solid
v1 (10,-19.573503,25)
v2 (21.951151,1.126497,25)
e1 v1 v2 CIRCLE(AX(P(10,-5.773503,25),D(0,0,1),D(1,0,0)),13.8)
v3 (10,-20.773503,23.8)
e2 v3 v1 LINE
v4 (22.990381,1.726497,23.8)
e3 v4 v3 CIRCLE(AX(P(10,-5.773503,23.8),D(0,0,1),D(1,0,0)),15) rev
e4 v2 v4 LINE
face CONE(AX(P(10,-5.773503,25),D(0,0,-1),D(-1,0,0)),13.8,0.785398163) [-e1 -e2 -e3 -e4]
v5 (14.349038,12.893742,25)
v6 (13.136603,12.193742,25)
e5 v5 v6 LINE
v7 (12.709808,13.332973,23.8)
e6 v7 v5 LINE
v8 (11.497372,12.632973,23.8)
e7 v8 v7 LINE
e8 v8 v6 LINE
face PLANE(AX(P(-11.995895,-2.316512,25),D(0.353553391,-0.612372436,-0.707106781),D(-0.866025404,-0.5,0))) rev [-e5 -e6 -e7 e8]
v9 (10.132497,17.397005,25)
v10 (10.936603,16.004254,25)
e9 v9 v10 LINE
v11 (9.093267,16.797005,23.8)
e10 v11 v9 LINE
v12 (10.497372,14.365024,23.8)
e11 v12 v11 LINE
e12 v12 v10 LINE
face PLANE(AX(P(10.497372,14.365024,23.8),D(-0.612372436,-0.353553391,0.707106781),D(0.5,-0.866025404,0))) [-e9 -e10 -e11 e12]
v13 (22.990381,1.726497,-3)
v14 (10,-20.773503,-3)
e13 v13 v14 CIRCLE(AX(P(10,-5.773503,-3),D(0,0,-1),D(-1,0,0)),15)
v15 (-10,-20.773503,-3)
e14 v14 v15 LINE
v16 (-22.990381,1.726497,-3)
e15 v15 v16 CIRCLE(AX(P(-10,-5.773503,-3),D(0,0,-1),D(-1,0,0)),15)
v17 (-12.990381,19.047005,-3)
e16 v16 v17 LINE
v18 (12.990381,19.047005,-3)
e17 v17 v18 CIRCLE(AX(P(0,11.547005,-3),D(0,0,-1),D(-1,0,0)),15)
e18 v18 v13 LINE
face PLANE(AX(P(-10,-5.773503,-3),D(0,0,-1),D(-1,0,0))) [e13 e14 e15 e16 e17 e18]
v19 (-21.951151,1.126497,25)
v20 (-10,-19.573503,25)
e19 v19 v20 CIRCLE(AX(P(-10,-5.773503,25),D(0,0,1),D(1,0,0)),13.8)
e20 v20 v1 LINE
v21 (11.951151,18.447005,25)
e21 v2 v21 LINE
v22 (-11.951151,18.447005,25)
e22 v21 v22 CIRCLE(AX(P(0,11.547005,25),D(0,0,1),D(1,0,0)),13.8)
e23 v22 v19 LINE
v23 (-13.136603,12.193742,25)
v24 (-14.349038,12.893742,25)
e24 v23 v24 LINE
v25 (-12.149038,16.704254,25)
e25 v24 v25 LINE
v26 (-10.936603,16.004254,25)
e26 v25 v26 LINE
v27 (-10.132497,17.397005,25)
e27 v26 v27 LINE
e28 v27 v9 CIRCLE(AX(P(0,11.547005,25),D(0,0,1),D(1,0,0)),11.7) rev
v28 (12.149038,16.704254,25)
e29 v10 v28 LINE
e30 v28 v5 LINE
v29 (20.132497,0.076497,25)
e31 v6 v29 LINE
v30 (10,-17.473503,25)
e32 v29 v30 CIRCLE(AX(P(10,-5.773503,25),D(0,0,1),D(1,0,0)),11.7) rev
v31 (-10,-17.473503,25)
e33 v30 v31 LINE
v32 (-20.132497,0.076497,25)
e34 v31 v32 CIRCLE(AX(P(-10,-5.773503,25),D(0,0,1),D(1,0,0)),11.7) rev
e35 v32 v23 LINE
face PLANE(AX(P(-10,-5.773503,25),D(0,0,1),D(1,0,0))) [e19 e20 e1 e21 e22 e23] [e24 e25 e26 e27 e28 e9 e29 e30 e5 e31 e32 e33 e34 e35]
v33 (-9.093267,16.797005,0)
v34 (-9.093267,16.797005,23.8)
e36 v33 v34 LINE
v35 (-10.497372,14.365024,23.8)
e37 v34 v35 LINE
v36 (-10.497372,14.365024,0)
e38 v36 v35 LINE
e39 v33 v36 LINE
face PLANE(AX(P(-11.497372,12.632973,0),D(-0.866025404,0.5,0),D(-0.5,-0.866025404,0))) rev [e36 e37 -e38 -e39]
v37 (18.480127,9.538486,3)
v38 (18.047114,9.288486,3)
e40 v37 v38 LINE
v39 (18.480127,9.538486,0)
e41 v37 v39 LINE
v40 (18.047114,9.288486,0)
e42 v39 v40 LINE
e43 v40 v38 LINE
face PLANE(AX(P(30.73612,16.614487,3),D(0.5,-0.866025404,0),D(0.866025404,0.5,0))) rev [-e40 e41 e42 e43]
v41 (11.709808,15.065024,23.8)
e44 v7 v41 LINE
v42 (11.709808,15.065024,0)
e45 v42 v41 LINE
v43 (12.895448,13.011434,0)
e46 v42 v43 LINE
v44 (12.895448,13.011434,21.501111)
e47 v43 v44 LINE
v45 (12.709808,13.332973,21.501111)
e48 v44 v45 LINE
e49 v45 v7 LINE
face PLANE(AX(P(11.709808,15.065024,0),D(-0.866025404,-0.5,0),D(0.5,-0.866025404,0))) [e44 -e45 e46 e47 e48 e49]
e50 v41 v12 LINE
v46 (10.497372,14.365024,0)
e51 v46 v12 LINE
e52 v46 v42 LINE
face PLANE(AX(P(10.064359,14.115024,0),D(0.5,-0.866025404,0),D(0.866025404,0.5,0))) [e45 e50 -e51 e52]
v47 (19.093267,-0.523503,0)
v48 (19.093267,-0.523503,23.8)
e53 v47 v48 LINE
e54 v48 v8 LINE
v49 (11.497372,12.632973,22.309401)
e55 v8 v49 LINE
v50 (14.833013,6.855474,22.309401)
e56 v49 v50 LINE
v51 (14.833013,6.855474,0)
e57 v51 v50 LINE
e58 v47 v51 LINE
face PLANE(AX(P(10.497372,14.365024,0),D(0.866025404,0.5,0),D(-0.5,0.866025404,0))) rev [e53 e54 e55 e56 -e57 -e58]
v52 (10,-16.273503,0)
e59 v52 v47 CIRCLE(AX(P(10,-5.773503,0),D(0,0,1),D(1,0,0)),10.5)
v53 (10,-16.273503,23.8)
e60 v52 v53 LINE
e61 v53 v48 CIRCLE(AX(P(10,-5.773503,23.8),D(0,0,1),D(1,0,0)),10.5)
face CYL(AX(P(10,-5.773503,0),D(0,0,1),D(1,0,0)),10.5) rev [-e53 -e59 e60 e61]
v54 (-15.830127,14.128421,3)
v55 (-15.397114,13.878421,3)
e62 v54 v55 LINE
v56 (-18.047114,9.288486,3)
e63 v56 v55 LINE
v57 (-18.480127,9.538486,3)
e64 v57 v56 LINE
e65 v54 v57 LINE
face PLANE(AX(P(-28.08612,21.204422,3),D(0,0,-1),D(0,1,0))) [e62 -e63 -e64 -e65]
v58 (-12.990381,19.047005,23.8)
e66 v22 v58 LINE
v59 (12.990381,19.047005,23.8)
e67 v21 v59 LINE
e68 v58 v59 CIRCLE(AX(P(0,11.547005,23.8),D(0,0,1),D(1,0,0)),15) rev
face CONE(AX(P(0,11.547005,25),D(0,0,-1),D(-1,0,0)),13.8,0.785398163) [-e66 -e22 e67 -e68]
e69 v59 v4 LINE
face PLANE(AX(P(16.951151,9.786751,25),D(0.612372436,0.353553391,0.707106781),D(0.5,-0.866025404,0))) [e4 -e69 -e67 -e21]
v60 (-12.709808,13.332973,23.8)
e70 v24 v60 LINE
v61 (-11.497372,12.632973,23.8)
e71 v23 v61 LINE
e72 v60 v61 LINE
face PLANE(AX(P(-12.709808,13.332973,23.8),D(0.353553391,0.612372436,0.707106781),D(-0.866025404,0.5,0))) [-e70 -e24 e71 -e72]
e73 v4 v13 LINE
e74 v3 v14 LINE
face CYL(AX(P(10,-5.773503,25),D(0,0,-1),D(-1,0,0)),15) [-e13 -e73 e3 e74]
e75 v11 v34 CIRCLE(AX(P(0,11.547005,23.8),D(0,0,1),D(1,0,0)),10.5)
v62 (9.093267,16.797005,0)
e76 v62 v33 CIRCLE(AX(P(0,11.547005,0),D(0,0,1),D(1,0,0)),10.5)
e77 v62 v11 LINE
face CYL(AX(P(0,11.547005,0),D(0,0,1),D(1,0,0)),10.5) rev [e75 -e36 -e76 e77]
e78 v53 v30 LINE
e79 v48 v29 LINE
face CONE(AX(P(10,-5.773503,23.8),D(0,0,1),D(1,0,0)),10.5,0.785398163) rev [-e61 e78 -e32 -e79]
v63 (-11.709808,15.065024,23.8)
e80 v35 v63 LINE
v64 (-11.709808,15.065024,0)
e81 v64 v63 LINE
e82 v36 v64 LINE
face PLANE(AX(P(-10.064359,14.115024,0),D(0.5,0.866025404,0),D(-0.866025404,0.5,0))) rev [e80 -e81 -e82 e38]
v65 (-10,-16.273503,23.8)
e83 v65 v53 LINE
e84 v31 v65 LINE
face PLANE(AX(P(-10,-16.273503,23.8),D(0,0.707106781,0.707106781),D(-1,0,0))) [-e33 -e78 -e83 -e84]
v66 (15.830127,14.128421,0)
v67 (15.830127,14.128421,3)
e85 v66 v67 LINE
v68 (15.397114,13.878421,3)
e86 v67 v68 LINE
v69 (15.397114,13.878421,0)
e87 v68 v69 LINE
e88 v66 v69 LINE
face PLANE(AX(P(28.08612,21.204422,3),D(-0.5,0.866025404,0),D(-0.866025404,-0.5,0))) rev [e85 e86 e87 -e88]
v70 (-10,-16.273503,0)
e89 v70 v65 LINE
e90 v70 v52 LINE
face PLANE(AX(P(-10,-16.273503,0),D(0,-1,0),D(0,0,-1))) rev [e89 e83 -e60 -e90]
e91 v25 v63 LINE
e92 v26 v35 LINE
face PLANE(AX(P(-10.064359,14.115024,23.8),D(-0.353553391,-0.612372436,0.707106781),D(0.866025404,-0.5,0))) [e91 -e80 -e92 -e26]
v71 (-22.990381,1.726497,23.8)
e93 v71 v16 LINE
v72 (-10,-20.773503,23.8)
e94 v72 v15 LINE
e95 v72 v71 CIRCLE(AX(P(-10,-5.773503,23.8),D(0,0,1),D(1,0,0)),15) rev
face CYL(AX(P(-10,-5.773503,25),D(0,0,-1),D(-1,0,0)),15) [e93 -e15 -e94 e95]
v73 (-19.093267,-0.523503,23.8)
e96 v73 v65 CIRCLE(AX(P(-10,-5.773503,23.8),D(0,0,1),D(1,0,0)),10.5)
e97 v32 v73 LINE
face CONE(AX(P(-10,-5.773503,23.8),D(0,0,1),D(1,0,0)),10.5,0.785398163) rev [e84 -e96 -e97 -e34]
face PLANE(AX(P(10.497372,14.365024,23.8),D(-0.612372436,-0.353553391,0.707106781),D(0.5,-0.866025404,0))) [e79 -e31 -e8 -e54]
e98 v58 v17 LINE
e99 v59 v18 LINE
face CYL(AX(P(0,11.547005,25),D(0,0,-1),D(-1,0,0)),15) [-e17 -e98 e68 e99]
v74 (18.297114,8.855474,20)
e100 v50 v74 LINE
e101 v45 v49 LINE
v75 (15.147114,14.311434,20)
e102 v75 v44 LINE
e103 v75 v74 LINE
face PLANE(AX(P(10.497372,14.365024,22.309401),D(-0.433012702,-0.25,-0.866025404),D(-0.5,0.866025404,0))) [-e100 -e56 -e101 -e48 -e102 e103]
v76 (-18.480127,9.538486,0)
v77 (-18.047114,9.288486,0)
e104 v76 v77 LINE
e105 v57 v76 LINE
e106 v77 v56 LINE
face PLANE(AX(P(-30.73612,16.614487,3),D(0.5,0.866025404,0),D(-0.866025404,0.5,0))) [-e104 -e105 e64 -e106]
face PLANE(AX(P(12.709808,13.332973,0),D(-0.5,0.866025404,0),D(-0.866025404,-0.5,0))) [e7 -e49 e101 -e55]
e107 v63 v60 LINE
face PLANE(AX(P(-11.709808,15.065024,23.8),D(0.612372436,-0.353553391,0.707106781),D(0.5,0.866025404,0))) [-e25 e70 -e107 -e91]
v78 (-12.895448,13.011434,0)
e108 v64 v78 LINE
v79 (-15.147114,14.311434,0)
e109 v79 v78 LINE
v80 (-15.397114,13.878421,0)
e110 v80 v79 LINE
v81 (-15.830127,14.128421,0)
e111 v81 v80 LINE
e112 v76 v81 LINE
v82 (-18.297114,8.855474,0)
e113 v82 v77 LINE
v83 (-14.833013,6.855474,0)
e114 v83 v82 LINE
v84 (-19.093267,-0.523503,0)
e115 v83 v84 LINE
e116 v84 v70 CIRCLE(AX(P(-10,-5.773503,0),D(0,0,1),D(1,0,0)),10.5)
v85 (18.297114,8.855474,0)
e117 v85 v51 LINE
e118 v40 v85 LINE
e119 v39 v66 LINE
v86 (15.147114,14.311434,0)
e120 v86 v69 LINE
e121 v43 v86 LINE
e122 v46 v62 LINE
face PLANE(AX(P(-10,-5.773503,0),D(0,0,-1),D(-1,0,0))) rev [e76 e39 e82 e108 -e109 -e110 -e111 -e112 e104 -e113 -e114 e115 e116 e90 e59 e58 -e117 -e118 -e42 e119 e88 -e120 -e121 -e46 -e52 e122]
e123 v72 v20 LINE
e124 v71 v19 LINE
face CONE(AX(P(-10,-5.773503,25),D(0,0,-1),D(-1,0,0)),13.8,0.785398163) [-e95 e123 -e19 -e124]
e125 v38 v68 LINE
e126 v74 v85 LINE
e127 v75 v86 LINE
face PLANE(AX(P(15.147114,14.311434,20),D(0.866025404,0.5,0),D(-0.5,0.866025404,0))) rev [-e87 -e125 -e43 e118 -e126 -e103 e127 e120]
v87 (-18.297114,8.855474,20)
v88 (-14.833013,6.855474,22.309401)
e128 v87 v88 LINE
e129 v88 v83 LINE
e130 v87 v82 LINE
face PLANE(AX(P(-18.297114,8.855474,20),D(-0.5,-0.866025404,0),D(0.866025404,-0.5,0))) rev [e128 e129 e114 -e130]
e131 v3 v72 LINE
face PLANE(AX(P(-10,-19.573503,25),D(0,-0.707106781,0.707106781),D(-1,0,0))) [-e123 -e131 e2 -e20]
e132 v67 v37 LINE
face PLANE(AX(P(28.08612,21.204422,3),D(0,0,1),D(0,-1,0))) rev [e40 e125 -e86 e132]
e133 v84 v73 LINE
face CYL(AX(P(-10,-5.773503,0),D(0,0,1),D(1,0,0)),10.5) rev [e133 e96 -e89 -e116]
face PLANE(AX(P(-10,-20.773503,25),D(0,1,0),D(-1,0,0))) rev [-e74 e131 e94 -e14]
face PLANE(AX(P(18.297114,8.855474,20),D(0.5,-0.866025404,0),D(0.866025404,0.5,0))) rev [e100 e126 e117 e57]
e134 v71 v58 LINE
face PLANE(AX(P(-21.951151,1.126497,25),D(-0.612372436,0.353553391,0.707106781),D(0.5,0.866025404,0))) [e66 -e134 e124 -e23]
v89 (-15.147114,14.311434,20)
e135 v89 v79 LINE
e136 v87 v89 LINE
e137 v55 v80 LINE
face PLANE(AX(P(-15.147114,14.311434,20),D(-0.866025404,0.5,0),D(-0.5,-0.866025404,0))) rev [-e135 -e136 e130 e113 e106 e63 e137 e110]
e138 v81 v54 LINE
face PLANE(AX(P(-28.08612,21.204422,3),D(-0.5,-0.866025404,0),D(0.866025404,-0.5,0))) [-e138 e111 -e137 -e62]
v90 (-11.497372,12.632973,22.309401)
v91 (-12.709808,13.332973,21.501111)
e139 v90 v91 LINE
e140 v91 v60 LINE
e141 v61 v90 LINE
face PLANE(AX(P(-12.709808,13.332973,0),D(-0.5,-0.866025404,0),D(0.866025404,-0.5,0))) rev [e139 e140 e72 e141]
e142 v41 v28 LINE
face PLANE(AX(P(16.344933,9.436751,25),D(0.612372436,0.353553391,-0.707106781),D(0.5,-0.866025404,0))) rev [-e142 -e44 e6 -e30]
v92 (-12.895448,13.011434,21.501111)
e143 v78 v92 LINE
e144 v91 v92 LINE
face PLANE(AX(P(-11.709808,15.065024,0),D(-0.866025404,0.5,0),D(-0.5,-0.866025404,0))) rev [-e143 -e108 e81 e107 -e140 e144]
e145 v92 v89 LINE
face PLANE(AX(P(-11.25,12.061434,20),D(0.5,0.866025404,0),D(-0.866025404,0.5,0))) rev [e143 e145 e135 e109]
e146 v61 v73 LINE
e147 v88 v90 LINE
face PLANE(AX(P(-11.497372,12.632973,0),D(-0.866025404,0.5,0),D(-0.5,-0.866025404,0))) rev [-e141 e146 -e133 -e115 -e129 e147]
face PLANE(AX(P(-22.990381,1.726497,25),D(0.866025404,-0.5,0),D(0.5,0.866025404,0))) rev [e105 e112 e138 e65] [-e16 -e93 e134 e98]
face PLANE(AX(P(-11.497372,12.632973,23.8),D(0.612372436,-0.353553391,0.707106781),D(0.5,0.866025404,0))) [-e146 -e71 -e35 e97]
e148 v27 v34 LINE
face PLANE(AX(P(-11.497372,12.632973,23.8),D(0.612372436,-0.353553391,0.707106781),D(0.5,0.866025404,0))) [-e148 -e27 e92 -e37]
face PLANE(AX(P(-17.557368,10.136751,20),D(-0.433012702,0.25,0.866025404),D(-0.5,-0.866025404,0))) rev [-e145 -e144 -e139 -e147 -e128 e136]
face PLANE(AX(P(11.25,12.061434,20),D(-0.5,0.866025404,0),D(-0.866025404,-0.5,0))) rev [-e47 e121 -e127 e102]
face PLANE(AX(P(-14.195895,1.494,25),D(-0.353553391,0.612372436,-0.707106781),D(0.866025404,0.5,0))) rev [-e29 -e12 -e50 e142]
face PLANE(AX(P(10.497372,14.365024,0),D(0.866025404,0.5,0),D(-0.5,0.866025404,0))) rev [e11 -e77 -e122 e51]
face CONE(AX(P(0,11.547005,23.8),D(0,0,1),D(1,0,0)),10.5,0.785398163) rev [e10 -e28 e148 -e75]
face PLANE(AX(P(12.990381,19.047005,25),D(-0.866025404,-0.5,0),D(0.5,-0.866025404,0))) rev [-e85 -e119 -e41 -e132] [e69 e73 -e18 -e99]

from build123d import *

# Parameters (mm, degrees)
BOSS_EXTRU_1_DEPTH      = 25
ENL_V_MAT_EXTRU_1_DEPTH = 20
ENL_V_MAT_EXTRU_2_DEPTH = 45.21248121115924
ENL_V_MAT_EXTRU_4_DEPTH = 20
ENL_V_MAT_EXTRU_3_DEPTH = 45.21248121115924
CHANFREIN1_SIZE         = 1.2
BOSS_EXTRU_2_START      = 3
BOSS_EXTRU_2_DEPTH      = 3
ENL_V_MAT_EXTRU_5_REACH = 47.001
ESQUISSE7_W             = 1.399999999999995
ESQUISSE7_H             = 20
CHANFREIN2_SIZE2        = 4
CHANFREIN2_SIZE         = 2.309401077
ENL_V_MAT_EXTRU_6_REACH = 60.237
CHANFREIN3_SIZE2        = 4
CHANFREIN3_SIZE         = 2.309401077


with BuildPart() as part:
    # Esquisse1 → Boss.-Extru.1 (new body)
    with BuildSketch(Plane.XY):
        with BuildLine():
            Line((-22.99038105676658, 1.7264973081037391), (-12.990381056766578, 19.047005383792516))
            ThreePointArc((-12.990381056766578, 19.047005383792516), (9.5e-16, 26.547005383792516), (12.990381056766578, 19.047005383792513))
            Line((12.990381056766578, 19.047005383792513), (22.990381056766577, 1.726497308103746))
            ThreePointArc((22.990381056766577, 1.726497308103746), (22.99038105676658, -13.273502691896258), (9.999999999999996, -20.77350269189626))
            Line((9.999999999999996, -20.77350269189626), (-10, -20.773502691896258))
            ThreePointArc((-10, -20.773502691896258), (-22.99038105676658, -13.273502691896255), (-22.99038105676658, 1.7264973081037391))
        make_face()
        with BuildLine():
            Line((-18.66025403784439, -0.7735026918962613), (-8.66025403784439, 16.547005383792516))
            ThreePointArc((-8.66025403784439, 16.547005383792516), (-2.69e-15, 21.547005383792516), (8.660254037844384, 16.547005383792516))
            Line((8.660254037844384, 16.547005383792516), (18.660254037844386, -0.7735026918962474))
            ThreePointArc((18.660254037844386, -0.7735026918962474), (18.660254037844393, -10.773502691896258), (10, -15.773502691896258))
            Line((10, -15.773502691896258), (-10, -15.773502691896258))
            ThreePointArc((-10, -15.773502691896258), (-18.66025403784439, -10.773502691896262), (-18.66025403784439, -0.7735026918962613))
        make_face(mode=Mode.SUBTRACT)
    extrude(amount=BOSS_EXTRU_1_DEPTH)

    # Esquisse2 → Enlèv. mat.-Extru.1 (cut)
    with BuildSketch(Plane.XY.offset(25)):
        Polygon((-10.914359353944898, 12.642780450695335), (-12.300000000000002, 13.442780450695334), (-11.600000000000003, 14.655216015993549), (-10.2143593539449, 13.855216015993548), align=None)
        Polygon((10.214359353944896, 13.855216015993548), (11.6, 14.655216015993549), (12.299999999999999, 13.442780450695334), (10.914359353944896, 12.642780450695334), align=None)
    extrude(amount=-ENL_V_MAT_EXTRU_1_DEPTH, mode=Mode.SUBTRACT)

    # Esquisse3 → Enlèv. mat.-Extru.2 (cut, through all)
    with BuildSketch(Plane.XY.offset(25)):
        Polygon((-10.064359353944898, 14.115023637128878), (-11.709807621135333, 15.06502363712888), (-12.709807621135335, 13.332972829560003), (-11.064359353944898, 12.382972829560003), align=None)
    enl_v_mat_extru_2 = extrude(amount=-ENL_V_MAT_EXTRU_2_DEPTH, mode=Mode.SUBTRACT)

    # Symétrie1: Enlèv. mat.-Extru.2 across plane
    add(enl_v_mat_extru_2.mirror(Plane(origin=(0, 0, 0), x_dir=(0, 0, 1), z_dir=(1, 0, 0))), mode=Mode.SUBTRACT)

    # Esquisse6 → Enlèv. mat.-Extru.4 (cut)
    with BuildSketch(Plane(origin=(0, 0, 0), x_dir=(-1, 0, 0), z_dir=(0, 0, -1))):
        Polygon((11.250000000000002, 12.061433798642659), (15.147114317029969, 14.31143379864266), (18.297114317029976, 8.855473754800698), (14.4, 6.605473754800695), align=None)
        Polygon((-11.249999999999998, 12.061433798642659), (-15.14711431702997, 14.311433798642657), (-18.297114317029973, 8.855473754800693), (-14.399999999999997, 6.605473754800696), align=None)
    extrude(amount=-ENL_V_MAT_EXTRU_4_DEPTH, mode=Mode.SUBTRACT)

    # Esquisse5 → Enlèv. mat.-Extru.3 (cut, through all)
    with BuildSketch(Plane.XY.offset(25)):
        with BuildLine():
            Line((-9.093266739736611, 16.797005383792516), (-10.497372055837118, 14.365023637128878))
            Line((-10.497372055837118, 14.365023637128878), (-11.497372055837118, 12.632972829560003))
            Line((-11.497372055837118, 12.632972829560003), (-19.093266739736613, -0.5235026918962613))
            ThreePointArc((-19.093266739736613, -0.5235026918962613), (-19.09326673973661, -11.023502691896262), (-10.000000000000002, -16.273502691896258))
            Line((-10.000000000000002, -16.273502691896258), (10.000000000000004, -16.273502691896258))
            ThreePointArc((10.000000000000004, -16.273502691896258), (19.09326673973661, -11.023502691896251), (19.093266739736602, -0.523502691896249))
            Line((19.093266739736602, -0.523502691896249), (11.497372055837113, 12.632972829560005))
            Line((11.497372055837113, 12.632972829560005), (10.497372055837118, 14.36502363712888))
            Line((10.497372055837118, 14.36502363712888), (9.0932667397366, 16.797005383792516))
            ThreePointArc((9.0932667397366, 16.797005383792516), (-2.66e-15, 22.047005383792516), (-9.093266739736611, 16.797005383792516))
        make_face()
        with BuildLine():
            Line((-8.66025403784439, 16.547005383792516), (-10.064359353944898, 14.115023637128878))
            Line((-10.064359353944898, 14.115023637128878), (-11.064359353944894, 12.382972829560005))
            Line((-11.064359353944894, 12.382972829560005), (-18.66025403784439, -0.7735026918962613))
            ThreePointArc((-18.66025403784439, -0.7735026918962613), (-18.66025403784439, -10.773502691896262), (-10, -15.773502691896258))
            Line((-10, -15.773502691896258), (10.000000000000002, -15.77350269189626))
            ThreePointArc((10.000000000000002, -15.77350269189626), (18.66025403784439, -10.773502691896255), (18.660254037844386, -0.7735026918962474))
            Line((18.660254037844386, -0.7735026918962474), (11.064359353944898, 12.382972829560003))
            Line((11.064359353944898, 12.382972829560003), (10.064359353944898, 14.115023637128878))
            Line((10.064359353944898, 14.115023637128878), (8.660254037844384, 16.547005383792516))
            ThreePointArc((8.660254037844384, 16.547005383792516), (-2.69e-15, 21.547005383792516), (-8.66025403784439, 16.547005383792516))
        make_face(mode=Mode.SUBTRACT)
    extrude(amount=-ENL_V_MAT_EXTRU_3_DEPTH, mode=Mode.SUBTRACT)

    # Chanfrein1
    chanfrein1_edges = [part.edges().sort_by_distance(p)[0] for p in [
        (22.99038105676658, -13.27350269189626, 25),
        (11.103589838486222, 14.715023637128876, 25),
        (-11.103589838486226, 14.71502363712888, 25),
        (-9.795319397786868, 15.581014510460694, 25),
        (9.795319397786855, 15.581014510460696, 25),
        (-7.11e-15, 22.047005383792516, 25),
        (-15.295319397786866, 6.054735068831872, 25),
        (-19.09326673973661, -11.023502691896262, 25),
        (1.78e-15, -16.273502691896258, 25),
        (19.093266739736606, -11.023502691896253, 25),
        (15.295319397786855, 6.054735068831873, 25),
        (17.990381056766577, 10.386751345948129, 25),
        (2.66e-15, 26.547005383792516, 25),
        (-17.99038105676658, 10.386751345948127, 25),
        (-22.99038105676658, -13.273502691896258, 25),
        (-12.209807621135333, 14.19899823334444, 25),
        (-12.103589838486226, 12.982972829560003, 25),
        (-1.78e-15, -20.77350269189626, 25),
        (12.209807621135335, 14.19899823334444, 25),
        (12.103589838486222, 12.982972829560001, 25),
    ]]
    chamfer(chanfrein1_edges, length=CHANFREIN1_SIZE)

    # Esquisse4 → Boss.-Extru.2 (add)
    with BuildSketch(Plane(origin=(0, 0, 0), x_dir=(-1, 0, 0), z_dir=(0, 0, -1)).offset(BOSS_EXTRU_2_START)):
        with BuildLine():
            Line((22.99038105676658, 1.7264973081037323), (12.990381056766578, 19.047005383792516))
            ThreePointArc((12.990381056766578, 19.047005383792516), (8.9e-16, 26.547005383792513), (-12.990381056766573, 19.047005383792513))
            Line((-12.990381056766573, 19.047005383792513), (-22.990381056766577, 1.726497308103746))
            ThreePointArc((-22.990381056766577, 1.726497308103746), (-22.99038105676658, -13.273502691896255), (-10.000000000000004, -20.773502691896258))
            Line((-10.000000000000004, -20.773502691896258), (9.999999999999996, -20.773502691896258))
            ThreePointArc((9.999999999999996, -20.773502691896258), (22.990381056766577, -13.273502691896262), (22.99038105676658, 1.7264973081037323))
        make_face()
    extrude(amount=-BOSS_EXTRU_2_DEPTH)

    # Esquisse7 → Enlèv. mat.-Extru.5 (cut, up to next)
    with BuildSketch(Plane(origin=(-2.5958946838994956, 4.496221483611885, 0), x_dir=(0.866025403784439, 0.4999999999999994, 0), z_dir=(-0.4999999999999994, 0.866025403784439, 0)), mode=Mode.PRIVATE) as enl_v_mat_extru_5_sk1:
        with Locations((16.973502691896265, -10)):
            Rectangle(ESQUISSE7_W, ESQUISSE7_H)
    enl_v_mat_extru_5_tool1 = extrude(enl_v_mat_extru_5_sk1.sketch, amount=-ENL_V_MAT_EXTRU_5_REACH, mode=Mode.PRIVATE) & part.part
    enl_v_mat_extru_5 = enl_v_mat_extru_5_tool1.solids().sort_by_distance((12.10359, 12.982973, 10))[0]
    add(enl_v_mat_extru_5, mode=Mode.SUBTRACT)

    # Symétrie2: Enlèv. mat.-Extru.5 across plane
    add(enl_v_mat_extru_5.mirror(Plane(origin=(0, 0, 0), x_dir=(0, 0, 1), z_dir=(1, 0, 0))), mode=Mode.SUBTRACT)

    # Chanfrein2
    chanfrein2_edges = [part.edges().sort_by_distance(p)[0] for p in [
        (13.16519237886467, 9.74422329218035, 20),
    ]]
    chanfrein2_side = [part.faces().sort_by_distance(p)[0] for p in [
        (13.16519237886467, 9.74422329218035, 20.04618802153517),
    ]]
    chamfer(chanfrein2_edges, length=CHANFREIN2_SIZE - 0.0001, length2=CHANFREIN2_SIZE2 - 0.0001, reference=chanfrein2_side[0])  # a hair under: the kernel refuses the full size

    # Esquisse8 → Enlèv. mat.-Extru.6 (cut, up to next)
    with BuildSketch(Plane(origin=(17.557368354874363, 10.13675134594814, 0), x_dir=(0, 0, 1), z_dir=(-0.8660254037844385, -0.5000000000000004, 0)), mode=Mode.PRIVATE) as enl_v_mat_extru_6_sk1:
        Polygon((3.0000000000000004, 4.320508075688777), (5.3e-16, 4.320508075688777), (8.7e-16, -0.9794919243112247), (3.000000000000001, -0.9794919243112244), align=None)
    enl_v_mat_extru_6_tool1 = extrude(enl_v_mat_extru_6_sk1.sketch, amount=-ENL_V_MAT_EXTRU_6_REACH, mode=Mode.PRIVATE) & part.part
    enl_v_mat_extru_6 = enl_v_mat_extru_6_tool1.solids().sort_by_distance((16.722114, 11.583454, 1.5))[0]
    add(enl_v_mat_extru_6, mode=Mode.SUBTRACT)

    # Symétrie3: Enlèv. mat.-Extru.6 across plane
    add(enl_v_mat_extru_6.mirror(Plane(origin=(0, 0, 0), x_dir=(0, 0, 1), z_dir=(1, 0, 0))), mode=Mode.SUBTRACT)

    # Chanfrein3
    chanfrein3_edges = [part.edges().sort_by_distance(p)[0] for p in [
        (-13.16519237886467, 9.74422329218035, 20),
    ]]
    chanfrein3_side = [part.faces().sort_by_distance(p)[0] for p in [
        (-13.16519237886467, 9.74422329218035, 20.04618802153517),
    ]]
    chamfer(chanfrein3_edges, length=CHANFREIN3_SIZE - 0.0001, length2=CHANFREIN3_SIZE2 - 0.0001, reference=chanfrein3_side[0])  # a hair under: the kernel refuses the full size


solid = part.part
